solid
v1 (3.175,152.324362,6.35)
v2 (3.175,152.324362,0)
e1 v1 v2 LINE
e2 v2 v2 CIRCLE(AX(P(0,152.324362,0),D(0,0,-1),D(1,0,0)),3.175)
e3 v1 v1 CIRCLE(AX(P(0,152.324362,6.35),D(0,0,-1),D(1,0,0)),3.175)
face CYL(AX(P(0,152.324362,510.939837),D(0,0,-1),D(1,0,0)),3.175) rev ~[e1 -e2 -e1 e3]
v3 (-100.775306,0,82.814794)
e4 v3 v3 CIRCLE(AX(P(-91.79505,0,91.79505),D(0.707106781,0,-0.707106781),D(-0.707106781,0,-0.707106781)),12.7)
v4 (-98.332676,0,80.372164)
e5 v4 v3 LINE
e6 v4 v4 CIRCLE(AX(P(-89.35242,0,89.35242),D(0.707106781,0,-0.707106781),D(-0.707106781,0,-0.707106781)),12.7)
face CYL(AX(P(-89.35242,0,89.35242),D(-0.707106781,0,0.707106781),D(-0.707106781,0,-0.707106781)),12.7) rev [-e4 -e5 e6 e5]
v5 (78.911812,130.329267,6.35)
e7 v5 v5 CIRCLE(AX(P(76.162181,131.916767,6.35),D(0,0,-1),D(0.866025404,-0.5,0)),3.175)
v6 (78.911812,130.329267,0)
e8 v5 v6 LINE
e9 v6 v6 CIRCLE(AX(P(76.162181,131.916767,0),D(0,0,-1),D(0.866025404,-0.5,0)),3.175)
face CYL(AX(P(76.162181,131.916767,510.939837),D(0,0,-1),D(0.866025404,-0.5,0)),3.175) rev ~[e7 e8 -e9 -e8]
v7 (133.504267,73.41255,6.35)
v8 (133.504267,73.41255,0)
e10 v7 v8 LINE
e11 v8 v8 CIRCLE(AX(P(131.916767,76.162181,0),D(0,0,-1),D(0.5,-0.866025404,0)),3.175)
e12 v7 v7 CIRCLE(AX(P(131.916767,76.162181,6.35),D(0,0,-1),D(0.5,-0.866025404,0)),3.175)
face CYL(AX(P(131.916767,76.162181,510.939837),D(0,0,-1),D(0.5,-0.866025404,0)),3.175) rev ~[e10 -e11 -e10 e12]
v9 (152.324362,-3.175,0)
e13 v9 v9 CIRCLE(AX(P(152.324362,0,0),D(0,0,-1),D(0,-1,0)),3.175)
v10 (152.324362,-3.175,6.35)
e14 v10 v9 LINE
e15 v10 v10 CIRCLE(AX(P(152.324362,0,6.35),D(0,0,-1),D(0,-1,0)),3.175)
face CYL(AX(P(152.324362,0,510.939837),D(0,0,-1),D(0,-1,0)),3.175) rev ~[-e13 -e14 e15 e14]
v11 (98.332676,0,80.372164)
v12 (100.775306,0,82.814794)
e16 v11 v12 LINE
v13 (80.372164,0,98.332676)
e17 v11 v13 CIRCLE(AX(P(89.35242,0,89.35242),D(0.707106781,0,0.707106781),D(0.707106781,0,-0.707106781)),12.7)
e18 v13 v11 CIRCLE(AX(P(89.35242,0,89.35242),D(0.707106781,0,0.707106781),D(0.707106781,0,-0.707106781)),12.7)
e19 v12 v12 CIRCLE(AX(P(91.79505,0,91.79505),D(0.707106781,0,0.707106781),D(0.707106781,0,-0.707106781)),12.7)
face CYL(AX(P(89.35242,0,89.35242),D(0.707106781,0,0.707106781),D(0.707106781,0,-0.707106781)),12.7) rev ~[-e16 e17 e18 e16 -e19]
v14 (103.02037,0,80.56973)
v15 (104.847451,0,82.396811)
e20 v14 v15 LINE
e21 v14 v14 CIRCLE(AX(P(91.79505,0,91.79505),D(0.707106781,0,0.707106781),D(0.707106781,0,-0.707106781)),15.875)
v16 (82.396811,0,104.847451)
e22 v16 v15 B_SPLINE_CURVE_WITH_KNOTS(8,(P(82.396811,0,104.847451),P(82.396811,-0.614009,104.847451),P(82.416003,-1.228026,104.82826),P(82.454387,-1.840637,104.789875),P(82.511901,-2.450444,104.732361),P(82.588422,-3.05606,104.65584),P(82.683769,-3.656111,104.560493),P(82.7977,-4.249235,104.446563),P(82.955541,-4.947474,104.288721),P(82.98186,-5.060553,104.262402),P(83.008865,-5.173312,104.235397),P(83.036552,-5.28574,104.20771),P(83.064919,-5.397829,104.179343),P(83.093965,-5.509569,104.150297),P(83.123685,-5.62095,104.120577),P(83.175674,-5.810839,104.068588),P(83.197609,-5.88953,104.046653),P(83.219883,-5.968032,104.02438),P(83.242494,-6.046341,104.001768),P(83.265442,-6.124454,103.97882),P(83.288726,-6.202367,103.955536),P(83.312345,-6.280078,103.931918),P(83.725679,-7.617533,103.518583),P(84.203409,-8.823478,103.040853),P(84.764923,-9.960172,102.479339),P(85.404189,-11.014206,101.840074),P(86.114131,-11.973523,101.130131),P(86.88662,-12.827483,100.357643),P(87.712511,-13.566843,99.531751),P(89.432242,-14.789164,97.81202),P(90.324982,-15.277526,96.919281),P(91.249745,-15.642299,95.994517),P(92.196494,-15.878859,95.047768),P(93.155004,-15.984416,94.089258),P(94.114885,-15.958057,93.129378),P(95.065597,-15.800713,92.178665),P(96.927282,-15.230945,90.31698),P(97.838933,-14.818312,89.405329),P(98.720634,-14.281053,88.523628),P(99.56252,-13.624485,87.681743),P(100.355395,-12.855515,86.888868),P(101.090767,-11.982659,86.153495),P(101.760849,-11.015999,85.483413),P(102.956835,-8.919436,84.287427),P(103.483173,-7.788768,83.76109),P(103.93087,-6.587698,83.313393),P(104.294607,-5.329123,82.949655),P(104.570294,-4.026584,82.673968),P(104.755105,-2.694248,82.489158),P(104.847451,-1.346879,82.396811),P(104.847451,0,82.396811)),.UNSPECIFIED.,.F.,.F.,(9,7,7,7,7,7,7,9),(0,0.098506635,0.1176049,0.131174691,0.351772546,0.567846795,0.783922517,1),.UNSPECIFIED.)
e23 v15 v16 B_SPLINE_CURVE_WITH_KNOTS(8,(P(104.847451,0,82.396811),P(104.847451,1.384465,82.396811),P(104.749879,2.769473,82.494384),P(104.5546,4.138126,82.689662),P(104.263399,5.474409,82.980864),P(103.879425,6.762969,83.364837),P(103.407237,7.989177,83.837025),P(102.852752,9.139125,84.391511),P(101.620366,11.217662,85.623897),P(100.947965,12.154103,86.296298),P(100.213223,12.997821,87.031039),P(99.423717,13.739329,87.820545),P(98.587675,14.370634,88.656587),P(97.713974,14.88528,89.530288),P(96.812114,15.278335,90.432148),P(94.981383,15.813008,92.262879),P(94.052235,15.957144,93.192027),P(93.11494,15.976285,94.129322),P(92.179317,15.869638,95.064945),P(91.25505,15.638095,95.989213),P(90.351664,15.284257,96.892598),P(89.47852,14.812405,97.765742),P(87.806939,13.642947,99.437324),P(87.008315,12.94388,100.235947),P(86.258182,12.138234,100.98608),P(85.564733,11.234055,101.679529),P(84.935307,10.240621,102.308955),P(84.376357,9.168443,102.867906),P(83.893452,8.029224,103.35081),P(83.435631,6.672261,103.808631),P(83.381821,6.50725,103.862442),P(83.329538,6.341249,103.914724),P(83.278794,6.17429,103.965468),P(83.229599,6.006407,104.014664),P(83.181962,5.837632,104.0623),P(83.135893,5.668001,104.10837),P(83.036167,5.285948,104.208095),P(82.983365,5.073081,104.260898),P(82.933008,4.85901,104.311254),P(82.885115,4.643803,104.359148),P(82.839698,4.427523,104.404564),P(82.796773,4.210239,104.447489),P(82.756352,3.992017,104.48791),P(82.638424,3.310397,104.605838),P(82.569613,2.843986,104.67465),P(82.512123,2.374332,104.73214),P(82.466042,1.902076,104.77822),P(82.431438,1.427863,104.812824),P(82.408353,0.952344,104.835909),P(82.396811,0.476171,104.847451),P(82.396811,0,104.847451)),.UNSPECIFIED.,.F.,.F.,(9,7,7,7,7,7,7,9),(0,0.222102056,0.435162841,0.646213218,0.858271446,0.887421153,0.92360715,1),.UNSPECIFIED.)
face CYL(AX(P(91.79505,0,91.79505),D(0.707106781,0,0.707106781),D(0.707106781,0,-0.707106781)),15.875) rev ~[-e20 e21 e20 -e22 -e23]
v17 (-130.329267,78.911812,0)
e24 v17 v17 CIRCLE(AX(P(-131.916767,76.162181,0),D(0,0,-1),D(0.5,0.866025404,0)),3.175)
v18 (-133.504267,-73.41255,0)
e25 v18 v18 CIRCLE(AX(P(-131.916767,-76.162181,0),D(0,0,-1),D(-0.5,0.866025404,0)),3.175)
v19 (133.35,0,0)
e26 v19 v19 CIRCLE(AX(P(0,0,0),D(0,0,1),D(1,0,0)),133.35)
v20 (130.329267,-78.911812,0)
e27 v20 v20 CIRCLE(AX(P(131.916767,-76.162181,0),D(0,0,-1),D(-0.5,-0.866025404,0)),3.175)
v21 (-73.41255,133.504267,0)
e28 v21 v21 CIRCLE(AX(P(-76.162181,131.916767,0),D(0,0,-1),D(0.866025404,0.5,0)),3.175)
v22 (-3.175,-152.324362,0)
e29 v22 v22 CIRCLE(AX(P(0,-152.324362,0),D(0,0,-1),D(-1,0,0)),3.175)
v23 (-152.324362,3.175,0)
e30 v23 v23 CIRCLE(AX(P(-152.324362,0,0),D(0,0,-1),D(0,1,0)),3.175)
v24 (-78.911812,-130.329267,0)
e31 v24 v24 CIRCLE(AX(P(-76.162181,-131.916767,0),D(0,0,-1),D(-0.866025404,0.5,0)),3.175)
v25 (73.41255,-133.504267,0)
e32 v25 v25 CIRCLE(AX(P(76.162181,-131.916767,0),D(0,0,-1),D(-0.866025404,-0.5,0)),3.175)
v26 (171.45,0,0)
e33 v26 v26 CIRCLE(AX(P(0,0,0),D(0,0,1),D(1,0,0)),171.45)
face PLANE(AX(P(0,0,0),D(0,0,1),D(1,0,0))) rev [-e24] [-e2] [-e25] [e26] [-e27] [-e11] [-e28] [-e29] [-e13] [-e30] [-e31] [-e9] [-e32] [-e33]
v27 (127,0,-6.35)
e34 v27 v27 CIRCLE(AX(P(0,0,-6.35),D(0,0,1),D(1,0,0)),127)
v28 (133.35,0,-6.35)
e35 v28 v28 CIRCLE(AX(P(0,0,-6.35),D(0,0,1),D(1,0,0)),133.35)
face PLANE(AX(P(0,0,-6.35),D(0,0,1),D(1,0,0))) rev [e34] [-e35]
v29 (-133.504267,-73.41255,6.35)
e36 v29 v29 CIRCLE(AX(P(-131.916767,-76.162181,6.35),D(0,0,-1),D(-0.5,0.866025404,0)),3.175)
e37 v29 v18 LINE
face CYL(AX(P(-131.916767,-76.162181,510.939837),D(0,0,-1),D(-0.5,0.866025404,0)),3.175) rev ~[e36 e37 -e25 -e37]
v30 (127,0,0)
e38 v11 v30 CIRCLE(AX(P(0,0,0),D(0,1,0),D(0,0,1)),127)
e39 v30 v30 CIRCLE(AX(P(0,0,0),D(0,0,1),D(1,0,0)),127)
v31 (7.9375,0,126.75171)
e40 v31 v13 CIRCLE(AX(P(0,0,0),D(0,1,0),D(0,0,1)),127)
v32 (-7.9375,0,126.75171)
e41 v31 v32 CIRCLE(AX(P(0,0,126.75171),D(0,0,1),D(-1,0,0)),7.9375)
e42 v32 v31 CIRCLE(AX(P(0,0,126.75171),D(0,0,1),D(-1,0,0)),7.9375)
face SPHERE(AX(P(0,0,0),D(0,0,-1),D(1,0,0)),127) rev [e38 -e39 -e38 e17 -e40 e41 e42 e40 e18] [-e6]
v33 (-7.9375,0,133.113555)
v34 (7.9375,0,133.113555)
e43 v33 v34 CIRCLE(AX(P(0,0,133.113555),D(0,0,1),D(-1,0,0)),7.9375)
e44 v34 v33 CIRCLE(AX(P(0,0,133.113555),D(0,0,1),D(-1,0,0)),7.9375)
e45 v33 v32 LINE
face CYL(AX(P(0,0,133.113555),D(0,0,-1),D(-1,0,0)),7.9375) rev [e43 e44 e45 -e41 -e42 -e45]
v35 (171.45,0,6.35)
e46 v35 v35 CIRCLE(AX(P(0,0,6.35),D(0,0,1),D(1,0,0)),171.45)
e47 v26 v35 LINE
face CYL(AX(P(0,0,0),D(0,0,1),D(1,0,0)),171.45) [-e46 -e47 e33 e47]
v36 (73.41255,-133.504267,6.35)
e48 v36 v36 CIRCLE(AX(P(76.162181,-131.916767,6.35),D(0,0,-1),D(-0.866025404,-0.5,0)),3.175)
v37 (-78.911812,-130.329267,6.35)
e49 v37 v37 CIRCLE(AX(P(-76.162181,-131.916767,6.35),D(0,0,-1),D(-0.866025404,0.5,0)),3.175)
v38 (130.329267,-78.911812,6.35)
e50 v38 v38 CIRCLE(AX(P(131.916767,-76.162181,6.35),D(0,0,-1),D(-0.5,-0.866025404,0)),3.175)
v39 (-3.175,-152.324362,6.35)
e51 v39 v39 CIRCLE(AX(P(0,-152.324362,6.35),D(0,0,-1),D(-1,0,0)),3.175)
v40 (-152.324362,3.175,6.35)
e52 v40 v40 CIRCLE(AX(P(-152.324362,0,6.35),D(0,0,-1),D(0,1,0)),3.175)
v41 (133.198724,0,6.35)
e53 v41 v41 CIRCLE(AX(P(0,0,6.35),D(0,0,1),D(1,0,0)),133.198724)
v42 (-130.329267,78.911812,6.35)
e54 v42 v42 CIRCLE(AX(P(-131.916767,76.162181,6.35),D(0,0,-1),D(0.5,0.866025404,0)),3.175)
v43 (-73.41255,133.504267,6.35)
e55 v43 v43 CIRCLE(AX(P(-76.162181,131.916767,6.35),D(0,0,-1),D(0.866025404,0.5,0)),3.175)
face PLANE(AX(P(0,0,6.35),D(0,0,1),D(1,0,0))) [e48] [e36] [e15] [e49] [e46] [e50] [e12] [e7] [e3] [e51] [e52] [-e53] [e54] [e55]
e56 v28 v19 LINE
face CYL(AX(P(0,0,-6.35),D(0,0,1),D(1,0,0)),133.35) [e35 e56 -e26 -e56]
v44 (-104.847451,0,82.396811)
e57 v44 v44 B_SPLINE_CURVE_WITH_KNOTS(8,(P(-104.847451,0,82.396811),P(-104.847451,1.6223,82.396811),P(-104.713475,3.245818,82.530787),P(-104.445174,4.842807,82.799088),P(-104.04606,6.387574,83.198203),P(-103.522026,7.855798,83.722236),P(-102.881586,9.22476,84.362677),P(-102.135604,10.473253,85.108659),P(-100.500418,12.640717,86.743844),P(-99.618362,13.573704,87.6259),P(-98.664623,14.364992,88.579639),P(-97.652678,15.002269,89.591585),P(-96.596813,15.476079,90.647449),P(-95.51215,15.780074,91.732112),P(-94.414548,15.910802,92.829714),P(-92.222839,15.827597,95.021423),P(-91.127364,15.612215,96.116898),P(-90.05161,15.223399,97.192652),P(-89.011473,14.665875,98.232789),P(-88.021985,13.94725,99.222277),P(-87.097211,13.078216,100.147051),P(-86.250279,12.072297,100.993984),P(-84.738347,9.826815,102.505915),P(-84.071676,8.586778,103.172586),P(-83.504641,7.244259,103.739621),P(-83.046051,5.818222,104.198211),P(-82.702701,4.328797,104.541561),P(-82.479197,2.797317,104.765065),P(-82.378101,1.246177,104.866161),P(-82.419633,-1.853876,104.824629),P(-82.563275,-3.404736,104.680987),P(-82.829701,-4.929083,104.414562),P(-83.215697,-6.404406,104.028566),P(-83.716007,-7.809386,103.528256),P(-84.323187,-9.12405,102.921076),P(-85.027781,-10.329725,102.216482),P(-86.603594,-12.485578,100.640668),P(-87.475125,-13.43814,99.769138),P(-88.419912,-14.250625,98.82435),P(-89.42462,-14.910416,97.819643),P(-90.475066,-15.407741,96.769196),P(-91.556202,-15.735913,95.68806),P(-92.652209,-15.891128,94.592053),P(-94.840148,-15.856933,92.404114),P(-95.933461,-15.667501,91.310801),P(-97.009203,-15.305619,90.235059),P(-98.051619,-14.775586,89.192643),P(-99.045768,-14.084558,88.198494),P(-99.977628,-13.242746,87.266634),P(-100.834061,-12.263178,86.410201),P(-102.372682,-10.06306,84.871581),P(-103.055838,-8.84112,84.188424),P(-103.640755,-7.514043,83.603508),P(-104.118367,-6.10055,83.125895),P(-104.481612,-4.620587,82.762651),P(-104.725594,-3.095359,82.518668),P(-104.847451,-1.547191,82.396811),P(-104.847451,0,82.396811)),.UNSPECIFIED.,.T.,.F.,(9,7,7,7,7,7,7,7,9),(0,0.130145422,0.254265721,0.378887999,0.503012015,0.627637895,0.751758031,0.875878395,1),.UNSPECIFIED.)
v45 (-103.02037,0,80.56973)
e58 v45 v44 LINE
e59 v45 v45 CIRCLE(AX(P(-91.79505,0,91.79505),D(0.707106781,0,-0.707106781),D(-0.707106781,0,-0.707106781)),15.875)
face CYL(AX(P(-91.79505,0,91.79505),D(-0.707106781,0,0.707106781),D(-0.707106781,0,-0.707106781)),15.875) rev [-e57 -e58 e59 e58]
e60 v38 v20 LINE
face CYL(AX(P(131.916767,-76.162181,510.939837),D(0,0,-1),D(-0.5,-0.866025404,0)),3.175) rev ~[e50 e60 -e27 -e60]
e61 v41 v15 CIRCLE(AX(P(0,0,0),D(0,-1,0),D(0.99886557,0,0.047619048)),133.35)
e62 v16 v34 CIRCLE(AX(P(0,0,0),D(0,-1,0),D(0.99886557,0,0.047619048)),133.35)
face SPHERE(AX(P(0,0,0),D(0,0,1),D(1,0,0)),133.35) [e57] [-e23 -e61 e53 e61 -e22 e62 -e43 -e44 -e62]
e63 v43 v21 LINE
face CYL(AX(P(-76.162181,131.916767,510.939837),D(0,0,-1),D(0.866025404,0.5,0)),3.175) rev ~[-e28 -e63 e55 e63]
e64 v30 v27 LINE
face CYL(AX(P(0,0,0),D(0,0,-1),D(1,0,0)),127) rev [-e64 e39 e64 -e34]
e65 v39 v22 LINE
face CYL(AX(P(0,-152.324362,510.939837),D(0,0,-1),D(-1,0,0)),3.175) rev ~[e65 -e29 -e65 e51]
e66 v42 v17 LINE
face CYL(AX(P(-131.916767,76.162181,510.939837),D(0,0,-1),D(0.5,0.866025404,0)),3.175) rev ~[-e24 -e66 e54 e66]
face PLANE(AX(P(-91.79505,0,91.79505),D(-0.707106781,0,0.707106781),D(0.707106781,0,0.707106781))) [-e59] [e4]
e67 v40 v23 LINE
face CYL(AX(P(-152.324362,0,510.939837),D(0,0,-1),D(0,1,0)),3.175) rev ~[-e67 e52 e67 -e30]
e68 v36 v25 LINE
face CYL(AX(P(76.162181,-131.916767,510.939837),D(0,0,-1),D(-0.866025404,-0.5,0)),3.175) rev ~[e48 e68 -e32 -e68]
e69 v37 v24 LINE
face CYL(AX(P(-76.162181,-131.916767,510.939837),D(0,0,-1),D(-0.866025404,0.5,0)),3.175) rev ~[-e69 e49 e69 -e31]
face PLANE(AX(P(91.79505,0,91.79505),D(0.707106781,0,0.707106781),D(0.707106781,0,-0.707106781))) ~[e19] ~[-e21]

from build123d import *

# Parameters (mm, degrees)
F9_D            = 6.35
F9_COPIES_COUNT = 12


# Not quite as in the source:
# - a pattern or mirror of a feature is missing from the dataset's text; its kind, count and spacing are read off the source's solid


with BuildPart() as f1:
    # F0 (on Front) → F1 (revolve)
    with BuildSketch(Plane.XZ):
        with BuildLine():
            ThreePointArc((0, 127), (89.8025612107, 89.8025612107), (127, 0))
            Line((127, 0), (127, -6.35))
            Line((127, -6.35), (133.35, -6.35))
            Line((133.35, -6.35), (133.35, 0))
            Line((133.35, 0), (171.45, 0))
            Line((171.45, 0), (171.45, 6.35))
            Line((171.45, 6.35), (133.1987237176, 6.35))
            ThreePointArc((133.1987237176, 6.35), (92.0202423383, 96.5116443752), (0, 133.35))
            Line((0, 133.35), (0, 127))
        make_face()
    revolve(axis=Axis((0, 0, 13.3139304817), (0, 0, 1)))

    # F4 (on Front) → F5 (revolve, cut)
    with BuildSketch(Plane.XZ):
        with BuildLine():
            ThreePointArc((89.8025612107, 89.8025612107), (94.1857207861, 85.1941899427), (98.3326763457, 80.3721641036))
            Line((98.3326763457, 80.3721641036), (100.7753060106, 82.8147937685))
            Line((100.7753060106, 82.8147937685), (103.0203700409, 80.5697297382))
            Line((103.0203700409, 80.5697297382), (110.3632345412, 87.9125942385))
            Line((110.3632345412, 87.9125942385), (94.2926892712, 94.2926892712))
            Line((94.2926892712, 94.2926892712), (89.8025612107, 89.8025612107))
        make_face()
    f5 = revolve(axis=Axis((92.047625241, 0, 92.047625241), (0.7071067812, 0, 0.7071067812)), mode=Mode.SUBTRACT)

    # F5_copies: F5 across plane
    add(f5.mirror(Plane(origin=(0, 0, 0), x_dir=(0, 0, -1), z_dir=(-1, 0, 0))), mode=Mode.SUBTRACT)

    # F6 (on Front) → F7 (revolve, cut)
    with BuildSketch(Plane.XZ):
        with BuildLine():
            ThreePointArc((-7.9375, 126.7517104175), (-3.9706911856, 126.9379124277), (0, 127))
            Line((0, 127), (0, 133.35))
            ThreePointArc((0, 133.35), (-3.9705104321, 133.2908757076), (-7.9375, 133.1135552592))
            Line((-7.9375, 133.1135552592), (-7.9375, 126.7517104175))
        make_face()
    revolve(axis=Axis((0, 0, 130.175), (0, 0, 1)), mode=Mode.SUBTRACT)

    # F9 (through all)
    with Locations(Plane.XY.offset(6.35)):
        with Locations((0, -152.3243618588)):
            f9 = Hole(F9_D / 2)

    # F9_copies: F9 ×12 about axis
    f9_copies_axis = Axis((0, 0, 0), (0, 0, 1))
    for i in range(1, F9_COPIES_COUNT):
        add(f9.rotate(f9_copies_axis, i * 360 / F9_COPIES_COUNT), mode=Mode.SUBTRACT)


solid = f1.part
